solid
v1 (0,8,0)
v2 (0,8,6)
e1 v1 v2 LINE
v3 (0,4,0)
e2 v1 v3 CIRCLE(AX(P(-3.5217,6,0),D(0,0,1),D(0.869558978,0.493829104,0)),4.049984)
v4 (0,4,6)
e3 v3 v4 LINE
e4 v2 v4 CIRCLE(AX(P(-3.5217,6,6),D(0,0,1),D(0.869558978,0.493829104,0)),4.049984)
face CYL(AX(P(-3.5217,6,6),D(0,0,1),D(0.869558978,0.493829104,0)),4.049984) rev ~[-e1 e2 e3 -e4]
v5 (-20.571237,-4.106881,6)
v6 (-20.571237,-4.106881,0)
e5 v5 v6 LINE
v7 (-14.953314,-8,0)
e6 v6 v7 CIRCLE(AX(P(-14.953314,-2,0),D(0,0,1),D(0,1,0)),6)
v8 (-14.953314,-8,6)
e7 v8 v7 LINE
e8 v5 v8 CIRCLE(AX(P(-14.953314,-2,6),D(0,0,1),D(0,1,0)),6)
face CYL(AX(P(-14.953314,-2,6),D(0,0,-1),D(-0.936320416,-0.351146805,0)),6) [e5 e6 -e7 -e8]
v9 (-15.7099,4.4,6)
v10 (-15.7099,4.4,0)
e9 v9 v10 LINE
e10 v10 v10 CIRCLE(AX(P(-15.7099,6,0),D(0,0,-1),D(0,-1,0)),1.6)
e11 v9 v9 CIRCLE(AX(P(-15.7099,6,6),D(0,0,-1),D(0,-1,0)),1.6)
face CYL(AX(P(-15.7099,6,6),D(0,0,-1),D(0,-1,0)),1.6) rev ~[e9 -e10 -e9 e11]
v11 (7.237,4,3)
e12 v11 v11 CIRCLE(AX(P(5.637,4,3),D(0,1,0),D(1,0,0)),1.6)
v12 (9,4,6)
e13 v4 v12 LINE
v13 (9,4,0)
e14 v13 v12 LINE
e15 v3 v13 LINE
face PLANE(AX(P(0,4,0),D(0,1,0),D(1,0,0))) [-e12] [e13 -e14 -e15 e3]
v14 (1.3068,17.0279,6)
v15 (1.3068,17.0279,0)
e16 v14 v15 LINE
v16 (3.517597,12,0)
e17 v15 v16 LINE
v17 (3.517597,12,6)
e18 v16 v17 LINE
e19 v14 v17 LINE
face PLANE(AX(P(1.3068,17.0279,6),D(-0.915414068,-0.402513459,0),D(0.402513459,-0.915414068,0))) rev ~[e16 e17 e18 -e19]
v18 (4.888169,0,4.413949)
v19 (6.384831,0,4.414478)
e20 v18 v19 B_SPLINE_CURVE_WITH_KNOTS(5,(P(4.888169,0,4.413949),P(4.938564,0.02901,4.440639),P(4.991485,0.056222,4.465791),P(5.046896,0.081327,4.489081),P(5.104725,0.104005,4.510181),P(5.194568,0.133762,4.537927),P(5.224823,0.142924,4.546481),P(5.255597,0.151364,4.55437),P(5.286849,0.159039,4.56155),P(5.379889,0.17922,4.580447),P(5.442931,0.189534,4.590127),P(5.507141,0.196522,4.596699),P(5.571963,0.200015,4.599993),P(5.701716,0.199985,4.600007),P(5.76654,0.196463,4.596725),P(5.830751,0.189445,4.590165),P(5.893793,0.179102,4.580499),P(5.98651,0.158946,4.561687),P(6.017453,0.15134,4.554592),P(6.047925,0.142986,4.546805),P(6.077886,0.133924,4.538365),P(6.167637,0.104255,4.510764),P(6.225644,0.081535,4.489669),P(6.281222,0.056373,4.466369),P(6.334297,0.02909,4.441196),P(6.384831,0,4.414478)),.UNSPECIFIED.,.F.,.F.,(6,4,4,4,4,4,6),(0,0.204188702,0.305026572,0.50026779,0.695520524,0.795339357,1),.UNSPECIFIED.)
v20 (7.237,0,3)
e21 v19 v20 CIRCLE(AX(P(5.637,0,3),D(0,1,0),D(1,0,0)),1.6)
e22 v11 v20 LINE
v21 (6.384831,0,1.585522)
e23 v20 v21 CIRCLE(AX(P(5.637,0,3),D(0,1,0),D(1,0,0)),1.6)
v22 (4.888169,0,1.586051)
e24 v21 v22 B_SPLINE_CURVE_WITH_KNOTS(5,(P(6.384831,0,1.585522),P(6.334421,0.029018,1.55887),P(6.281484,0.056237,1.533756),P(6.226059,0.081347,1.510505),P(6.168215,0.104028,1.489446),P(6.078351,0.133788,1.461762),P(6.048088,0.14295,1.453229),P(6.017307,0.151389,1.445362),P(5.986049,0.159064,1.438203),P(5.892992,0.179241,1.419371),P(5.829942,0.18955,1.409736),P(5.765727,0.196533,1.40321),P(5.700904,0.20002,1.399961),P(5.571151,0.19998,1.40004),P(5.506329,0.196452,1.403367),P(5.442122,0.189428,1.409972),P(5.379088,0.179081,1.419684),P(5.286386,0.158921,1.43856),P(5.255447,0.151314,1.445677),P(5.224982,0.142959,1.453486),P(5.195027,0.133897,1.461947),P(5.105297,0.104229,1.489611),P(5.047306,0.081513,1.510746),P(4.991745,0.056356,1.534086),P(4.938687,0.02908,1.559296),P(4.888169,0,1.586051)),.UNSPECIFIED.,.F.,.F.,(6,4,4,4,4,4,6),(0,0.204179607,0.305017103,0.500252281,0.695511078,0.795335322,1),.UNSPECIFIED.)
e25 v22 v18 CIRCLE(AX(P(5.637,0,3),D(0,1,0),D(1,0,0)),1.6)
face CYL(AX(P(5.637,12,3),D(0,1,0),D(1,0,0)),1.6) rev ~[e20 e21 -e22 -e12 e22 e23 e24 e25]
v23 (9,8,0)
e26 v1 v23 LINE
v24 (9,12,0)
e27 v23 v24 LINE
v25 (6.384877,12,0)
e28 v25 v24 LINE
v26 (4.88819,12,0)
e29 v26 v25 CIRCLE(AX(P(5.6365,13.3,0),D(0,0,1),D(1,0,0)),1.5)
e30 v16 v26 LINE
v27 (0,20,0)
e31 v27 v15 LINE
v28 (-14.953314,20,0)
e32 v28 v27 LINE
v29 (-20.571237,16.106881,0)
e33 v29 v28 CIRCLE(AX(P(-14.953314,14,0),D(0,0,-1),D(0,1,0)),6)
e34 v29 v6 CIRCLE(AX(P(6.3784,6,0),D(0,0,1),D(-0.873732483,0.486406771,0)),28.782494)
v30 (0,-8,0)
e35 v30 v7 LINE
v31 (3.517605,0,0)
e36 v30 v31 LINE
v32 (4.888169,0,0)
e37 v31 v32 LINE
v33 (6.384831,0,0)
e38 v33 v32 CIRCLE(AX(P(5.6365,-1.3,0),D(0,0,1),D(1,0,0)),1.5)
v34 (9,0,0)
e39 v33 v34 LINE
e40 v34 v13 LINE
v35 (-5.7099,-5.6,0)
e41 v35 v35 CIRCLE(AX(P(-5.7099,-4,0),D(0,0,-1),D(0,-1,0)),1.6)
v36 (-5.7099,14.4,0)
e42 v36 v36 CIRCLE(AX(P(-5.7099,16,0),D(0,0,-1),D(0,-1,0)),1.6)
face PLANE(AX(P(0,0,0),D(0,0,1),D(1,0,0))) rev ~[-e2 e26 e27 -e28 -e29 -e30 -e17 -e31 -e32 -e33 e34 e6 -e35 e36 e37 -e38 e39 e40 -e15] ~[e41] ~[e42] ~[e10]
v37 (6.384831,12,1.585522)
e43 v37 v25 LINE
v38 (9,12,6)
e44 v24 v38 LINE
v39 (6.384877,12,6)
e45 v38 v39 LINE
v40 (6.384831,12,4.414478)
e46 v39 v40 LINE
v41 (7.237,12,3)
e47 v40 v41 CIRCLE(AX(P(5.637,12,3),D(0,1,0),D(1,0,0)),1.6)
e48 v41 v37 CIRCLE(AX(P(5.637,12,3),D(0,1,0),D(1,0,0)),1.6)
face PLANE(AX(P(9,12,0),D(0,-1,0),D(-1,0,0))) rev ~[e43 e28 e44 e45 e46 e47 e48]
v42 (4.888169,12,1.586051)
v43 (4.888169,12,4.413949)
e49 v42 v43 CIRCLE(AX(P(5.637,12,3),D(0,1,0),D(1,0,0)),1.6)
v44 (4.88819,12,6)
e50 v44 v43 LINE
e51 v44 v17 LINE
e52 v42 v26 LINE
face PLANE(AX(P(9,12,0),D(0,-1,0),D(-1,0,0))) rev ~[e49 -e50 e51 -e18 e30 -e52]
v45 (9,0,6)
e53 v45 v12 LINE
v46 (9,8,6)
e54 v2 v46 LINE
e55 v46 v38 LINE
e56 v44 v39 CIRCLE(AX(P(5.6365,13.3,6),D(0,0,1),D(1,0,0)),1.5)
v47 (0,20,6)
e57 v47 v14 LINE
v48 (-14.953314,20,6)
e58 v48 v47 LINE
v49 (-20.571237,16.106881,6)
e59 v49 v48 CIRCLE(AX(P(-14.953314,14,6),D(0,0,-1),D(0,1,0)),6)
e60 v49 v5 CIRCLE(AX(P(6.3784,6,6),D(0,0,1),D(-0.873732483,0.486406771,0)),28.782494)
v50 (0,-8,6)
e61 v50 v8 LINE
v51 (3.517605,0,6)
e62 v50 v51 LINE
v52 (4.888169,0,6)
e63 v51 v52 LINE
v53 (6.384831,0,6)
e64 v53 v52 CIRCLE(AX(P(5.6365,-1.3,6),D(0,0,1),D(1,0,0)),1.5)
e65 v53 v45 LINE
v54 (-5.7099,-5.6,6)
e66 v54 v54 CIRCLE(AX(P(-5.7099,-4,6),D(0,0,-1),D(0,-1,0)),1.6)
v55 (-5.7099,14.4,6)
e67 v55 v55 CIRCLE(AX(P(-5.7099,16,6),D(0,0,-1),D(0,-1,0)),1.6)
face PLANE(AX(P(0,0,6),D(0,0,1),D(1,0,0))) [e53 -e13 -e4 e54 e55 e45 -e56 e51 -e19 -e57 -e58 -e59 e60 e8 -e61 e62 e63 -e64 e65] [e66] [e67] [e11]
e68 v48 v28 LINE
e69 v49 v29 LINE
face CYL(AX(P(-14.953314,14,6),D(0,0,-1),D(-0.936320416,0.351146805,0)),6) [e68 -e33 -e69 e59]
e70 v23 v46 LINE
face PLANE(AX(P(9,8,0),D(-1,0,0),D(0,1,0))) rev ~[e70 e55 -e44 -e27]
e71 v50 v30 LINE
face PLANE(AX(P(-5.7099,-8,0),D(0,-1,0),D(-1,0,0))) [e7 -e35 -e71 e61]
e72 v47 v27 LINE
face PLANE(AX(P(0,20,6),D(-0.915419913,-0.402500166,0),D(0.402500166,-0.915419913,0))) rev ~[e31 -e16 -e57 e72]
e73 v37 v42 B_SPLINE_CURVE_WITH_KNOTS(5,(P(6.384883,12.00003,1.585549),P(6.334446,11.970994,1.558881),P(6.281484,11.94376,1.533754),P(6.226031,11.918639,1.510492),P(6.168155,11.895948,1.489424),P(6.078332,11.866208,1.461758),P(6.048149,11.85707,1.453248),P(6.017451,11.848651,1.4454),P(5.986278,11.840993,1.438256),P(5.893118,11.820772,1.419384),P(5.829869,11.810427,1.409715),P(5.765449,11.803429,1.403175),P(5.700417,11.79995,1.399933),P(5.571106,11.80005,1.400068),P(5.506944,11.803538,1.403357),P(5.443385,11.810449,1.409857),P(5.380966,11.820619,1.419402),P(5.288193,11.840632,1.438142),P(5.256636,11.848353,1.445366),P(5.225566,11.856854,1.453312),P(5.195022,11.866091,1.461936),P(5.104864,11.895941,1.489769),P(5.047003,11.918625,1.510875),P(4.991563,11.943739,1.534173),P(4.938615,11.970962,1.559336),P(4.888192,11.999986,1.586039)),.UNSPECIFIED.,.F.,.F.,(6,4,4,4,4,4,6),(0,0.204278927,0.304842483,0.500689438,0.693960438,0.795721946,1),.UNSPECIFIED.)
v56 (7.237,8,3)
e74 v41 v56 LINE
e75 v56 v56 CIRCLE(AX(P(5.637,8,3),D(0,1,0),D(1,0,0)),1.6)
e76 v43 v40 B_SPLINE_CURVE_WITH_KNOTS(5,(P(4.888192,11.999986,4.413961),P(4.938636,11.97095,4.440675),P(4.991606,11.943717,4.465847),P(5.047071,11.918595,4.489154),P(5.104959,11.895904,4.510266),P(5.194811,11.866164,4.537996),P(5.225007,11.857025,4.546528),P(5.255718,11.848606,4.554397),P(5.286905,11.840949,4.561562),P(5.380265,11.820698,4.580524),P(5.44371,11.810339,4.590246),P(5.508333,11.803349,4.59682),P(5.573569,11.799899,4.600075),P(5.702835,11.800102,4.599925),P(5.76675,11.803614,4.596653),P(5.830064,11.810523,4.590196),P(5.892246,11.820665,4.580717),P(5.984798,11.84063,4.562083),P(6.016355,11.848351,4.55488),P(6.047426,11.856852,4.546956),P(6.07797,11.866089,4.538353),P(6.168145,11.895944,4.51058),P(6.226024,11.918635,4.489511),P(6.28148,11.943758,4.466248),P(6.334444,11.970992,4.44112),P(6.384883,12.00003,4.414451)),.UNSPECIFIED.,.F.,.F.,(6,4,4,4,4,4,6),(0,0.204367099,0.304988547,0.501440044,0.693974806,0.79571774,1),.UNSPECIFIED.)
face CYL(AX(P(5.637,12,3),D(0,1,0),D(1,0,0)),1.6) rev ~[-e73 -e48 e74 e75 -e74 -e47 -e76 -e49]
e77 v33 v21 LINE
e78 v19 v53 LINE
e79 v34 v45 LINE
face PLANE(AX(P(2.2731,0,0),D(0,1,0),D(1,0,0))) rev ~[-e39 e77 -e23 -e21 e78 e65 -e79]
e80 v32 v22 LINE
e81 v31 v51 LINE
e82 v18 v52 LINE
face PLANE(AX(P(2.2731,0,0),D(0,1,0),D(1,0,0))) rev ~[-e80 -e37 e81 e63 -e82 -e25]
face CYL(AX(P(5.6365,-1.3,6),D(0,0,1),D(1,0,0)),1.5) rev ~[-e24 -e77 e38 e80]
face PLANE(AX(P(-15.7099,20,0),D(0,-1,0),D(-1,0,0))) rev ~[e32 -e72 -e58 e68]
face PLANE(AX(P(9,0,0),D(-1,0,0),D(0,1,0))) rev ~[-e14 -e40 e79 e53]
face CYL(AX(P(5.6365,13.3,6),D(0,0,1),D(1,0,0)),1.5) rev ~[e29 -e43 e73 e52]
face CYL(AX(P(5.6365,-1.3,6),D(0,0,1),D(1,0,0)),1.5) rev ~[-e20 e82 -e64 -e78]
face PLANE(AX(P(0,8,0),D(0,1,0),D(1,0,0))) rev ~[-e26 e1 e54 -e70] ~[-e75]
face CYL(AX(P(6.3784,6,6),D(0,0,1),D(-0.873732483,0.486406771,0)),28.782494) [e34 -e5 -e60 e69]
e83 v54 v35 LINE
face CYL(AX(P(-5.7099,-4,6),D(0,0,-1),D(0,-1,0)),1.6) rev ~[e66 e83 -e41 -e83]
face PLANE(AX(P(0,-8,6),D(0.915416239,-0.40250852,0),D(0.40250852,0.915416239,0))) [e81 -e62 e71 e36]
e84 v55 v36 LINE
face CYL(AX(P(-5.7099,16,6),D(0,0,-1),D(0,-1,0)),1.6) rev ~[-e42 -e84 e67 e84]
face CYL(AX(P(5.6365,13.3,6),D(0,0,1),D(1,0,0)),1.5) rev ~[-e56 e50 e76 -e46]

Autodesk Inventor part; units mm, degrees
ref_plane "YZ Plane" through (0, 0, 0) normal (1, 0, 0) x (0, 1, 0)
ref_plane "XZ Plane" through (0, 0, 0) normal (0, 1, 0) x (-1, 0, 0)
ref_plane "XY Plane" through (0, 0, 0) normal (0, 0, 1) x (1, 0, 0)
sketch "スケッチ1" plane through (0, 0, 0) normal (0, 0, 1) x (1, 0, 0)
  line L0 (9, 0) -> (9, 4)
  line L1 (9, 12) -> (2.2731, 12)
  line L2 (0, 8) -> (9, 8)
  line L3 (0, 4) -> (9, 4)
  line L4 (9, 8) -> (9, 12)
  arc A0 (0, 8) -> (0, 4) centre (-5.7099, 6) ccw
  line L5 (2.2731, 12) -> (0, 14.2779)
  line L6 (2.2731, 0) -> (-5.7099, -8)
  line L7 (-5.7099, 20) -> (-15.7099, 20)
  line L8 (-5.7099, -8) -> (-15.7099, -8)
  line L9 (-15.7099, 20) -> (-25.7698, 20)
  line L10 (-25.7698, 20) -> (-25.7698, -8)
  line L11 (-25.7698, -8) -> (-15.7099, -8)
  line L12 (2.2731, 0) -> (9, 0)
  line L13 (0, 14.2779) -> (-5.7099, 20)
  point P0 (0, 0)
  point P1 (4.5, 12)
  point P2 (4.5, 0)
  point P3 (4.5, 4)
  point P4 (-25.7099, 6)
  dimension "d4" = 12.1
  dimension "d5" = 4
  dimension "d6" = 14
  dimension "d7" = 14
  dimension "d8" = 10
  dimension "d9" = 10
  dimension "d10" = 20
  dimension "d12" = 14
extrude "押し出し1" add sketch "スケッチ1" along normal blind 6
sketch "スケッチ2" plane through (0, 0, 6) normal (0, 0, 1) x (1, 0, 0)
  circle A0 centre (5.6365, 13.3) radius 1.5
  line L0 (9, 8) -> (9, 12) projected
  line L1 (11.5477, 6) -> (-28.1936, 6) construction
  line L2 (9, 12) -> (2.2731, 12) projected
  circle A1 centre (5.6365, -1.3) radius 1.5
  point P0 (0, 0)
  point P1 (4.8882, 12)
  point P2 (6.3849, 12)
  dimension "d15" = 3
  dimension "d16" = 3.3635
  dimension "d17" = 1.3
extrude "押し出し2" cut sketch "スケッチ2" against normal blind 6 contours A0 L2 | A1 picked at (5.4614, 13.0013)
sketch "スケッチ3" plane through (0, 0, 6) normal (0, 0, 1) x (1, 0, 0)
  circle A0 centre (5.6365, 13.3) radius 1.5
  line L0 (9, 12) -> (2.2731, 12) projected
  point P0 (0, 0)
  point P1 (4.8882, 12)
  point P2 (6.3849, 12)
  dimension "d20" = 3
  dimension "d21" = 1.3
extrude "押し出し3" add sketch "スケッチ3" against normal blind 6 contours A0 L0 picked at (5.4614, 13.0013)
sketch "スケッチ4" plane through (0, 0, 6) normal (0, 0, 1) x (1, 0, 0)
  arc A0 (6.3849, 12) -> (4.8882, 12) centre (5.6365, 13.3) ccw projected
  circle A1 centre (5.6365, 13.3) radius 1.5
  point P0 (0, 0)
  dimension "d24" = 3
extrude "押し出し4" cut sketch "スケッチ4" against normal blind 6
fillet "フィレット1" radius 5 1 edges at (-25.7698, 20, 3)
fillet "フィレット2" radius 5 1 edges at (-25.7698, -8, 3)
fillet "フィレット3" radius 3 4 edges at (-5.7099, -8, 3) (2.2731, 0, 3) (-5.7099, 20, 3) (2.2731, 12, 3)
sketch "スケッチ6" plane through (0, 4, 0) normal (0, 1, 0) x (1, 0, 0)
  point P0 (0, 0)
sketch "スケッチ7" plane through (4.8882, 12, 6) normal (0, 1, 0) x (1, 0, 0)
  circle A0 centre (0.7488, 3) radius 1.6
  line L0 (1.4967, 0) -> (0, 0) projected
  line L1 (4.1118, 6) -> (4.1118, 0) projected
  point P0 (-4.8882, 6)
  point P1 (0.7483, 0)
  dimension "d43" = 3.2
  dimension "d44" = 3
  dimension "d45" = 3.363
extrude "押し出し5" cut sketch "スケッチ7" against normal blind 28
sketch "スケッチ11" plane through (0, 0, 6) normal (0, 0, 1) x (1, 0, 0)
  line L0 (-6.9544, 20) -> (-20.7698, 20) projected
  line L1 (-20.7698, 20) -> (-6.9544, 20)
  arc A0 (1.394, 12.8809) -> (3.5176, 12) centre (3.5176, 15) ccw projected
  line L2 (0, 20) -> (1.3068, 17.0279)
  arc A1 (1.394, 12.8809) -> (3.5176, 12) centre (3.5176, 15) ccw
  arc A2 (-4.8308, 19.1191) -> (-6.9544, 20) centre (-6.9544, 17) ccw projected
  arc A3 (-4.8308, 19.1191) -> (-6.9544, 20) centre (-6.9544, 17) ccw
  line L3 (1.394, 12.8809) -> (-4.8308, 19.1191) projected
  line L4 (-4.8308, 19.1191) -> (1.394, 12.8809)
  arc A4 (0, 8) -> (0, 4) centre (-5.7099, 6) ccw projected
  line L5 (-11.7599, 6) -> (12.1155, 6) construction
  line L6 (-20.7698, -8) -> (0, -8)
  line L7 (0, -8) -> (3.5176, 0)
  arc A5 (-6.9544, -8) -> (-4.8308, -7.1191) centre (-6.9544, -5) ccw
  line L8 (1.394, -0.8809) -> (-4.8308, -7.1191)
  line L9 (-6.9544, 20) -> (0, 20)
  line L10 (1.3068, 17.0279) -> (3.5176, 12)
  arc A6 (3.5176, 0) -> (1.394, -0.8809) centre (3.5176, -3) ccw
  point P0 (0, 0)
extrude "押し出し6" add sketch "スケッチ11" against normal blind 6
sketch "スケッチ12" plane through (0, 0, 6) normal (0, 0, 1) x (1, 0, 0)
  arc A0 (0, 8) -> (0, 4) centre (-5.7099, 6) ccw projected
  point P0 (0, 0)
  point P1 (-15.7099, 6)
  point P2 (-5.7099, 16)
  point P3 (-5.7099, -4)
  dimension "d74" = 10
  dimension "d76" = 10
  dimension "d77" = 10
hole "穴4" at (-15.7099, 6, 6) at (-5.7099, 16, 6) at (-5.7099, -4, 6) direction (0, 0, -1) diameter 3.2 end through all
sketch "スケッチ13" plane through (0, 0, 6) normal (0, 0, 1) x (1, 0, 0)
  line L0 (-20.7698, -8) -> (0, -8) projected
  line L1 (0, 20) -> (-20.7698, 20) projected
  line L2 (-18.7698, 20) -> (-18.7698, -8) construction
  line L3 (-25.7698, 15) -> (-25.7698, -3) projected
  arc A0 (-18.7698, 20) -> (-18.7698, -8) centre (6.3784, 6) ccw
  line L4 (-18.7698, 20) -> (-29.3351, 20)
  line L5 (-29.3351, 20) -> (-29.3351, -8)
  line L6 (-29.3351, -8) -> (-18.7698, -8)
  point P0 (0, 0)
  dimension "d85" = 7
extrude "押し出し7" cut sketch "スケッチ13" against normal blind 6
fillet "フィレット4" radius 6 1 edges at (-18.7698, 20, 3)
fillet "フィレット5" radius 6 1 edges at (-18.7698, -8, 3)
sketch "スケッチ14" plane through (0, 0, 6) normal (0, 0, 1) x (1, 0, 0)
  arc A0 (0, 8) -> (0, 4) centre (-3.5217, 6) ccw
  arc A1 (0, 8) -> (0, 4) centre (-5.7099, 6) ccw projected
  point P0 (0, 0)
  point P1 (0, 4)
  dimension "d90" = 8.1
extrude "押し出し8" add sketch "スケッチ14" against normal blind 6
properties part number "射出_腕固定2" material "ポリカーボネート、クリア"
